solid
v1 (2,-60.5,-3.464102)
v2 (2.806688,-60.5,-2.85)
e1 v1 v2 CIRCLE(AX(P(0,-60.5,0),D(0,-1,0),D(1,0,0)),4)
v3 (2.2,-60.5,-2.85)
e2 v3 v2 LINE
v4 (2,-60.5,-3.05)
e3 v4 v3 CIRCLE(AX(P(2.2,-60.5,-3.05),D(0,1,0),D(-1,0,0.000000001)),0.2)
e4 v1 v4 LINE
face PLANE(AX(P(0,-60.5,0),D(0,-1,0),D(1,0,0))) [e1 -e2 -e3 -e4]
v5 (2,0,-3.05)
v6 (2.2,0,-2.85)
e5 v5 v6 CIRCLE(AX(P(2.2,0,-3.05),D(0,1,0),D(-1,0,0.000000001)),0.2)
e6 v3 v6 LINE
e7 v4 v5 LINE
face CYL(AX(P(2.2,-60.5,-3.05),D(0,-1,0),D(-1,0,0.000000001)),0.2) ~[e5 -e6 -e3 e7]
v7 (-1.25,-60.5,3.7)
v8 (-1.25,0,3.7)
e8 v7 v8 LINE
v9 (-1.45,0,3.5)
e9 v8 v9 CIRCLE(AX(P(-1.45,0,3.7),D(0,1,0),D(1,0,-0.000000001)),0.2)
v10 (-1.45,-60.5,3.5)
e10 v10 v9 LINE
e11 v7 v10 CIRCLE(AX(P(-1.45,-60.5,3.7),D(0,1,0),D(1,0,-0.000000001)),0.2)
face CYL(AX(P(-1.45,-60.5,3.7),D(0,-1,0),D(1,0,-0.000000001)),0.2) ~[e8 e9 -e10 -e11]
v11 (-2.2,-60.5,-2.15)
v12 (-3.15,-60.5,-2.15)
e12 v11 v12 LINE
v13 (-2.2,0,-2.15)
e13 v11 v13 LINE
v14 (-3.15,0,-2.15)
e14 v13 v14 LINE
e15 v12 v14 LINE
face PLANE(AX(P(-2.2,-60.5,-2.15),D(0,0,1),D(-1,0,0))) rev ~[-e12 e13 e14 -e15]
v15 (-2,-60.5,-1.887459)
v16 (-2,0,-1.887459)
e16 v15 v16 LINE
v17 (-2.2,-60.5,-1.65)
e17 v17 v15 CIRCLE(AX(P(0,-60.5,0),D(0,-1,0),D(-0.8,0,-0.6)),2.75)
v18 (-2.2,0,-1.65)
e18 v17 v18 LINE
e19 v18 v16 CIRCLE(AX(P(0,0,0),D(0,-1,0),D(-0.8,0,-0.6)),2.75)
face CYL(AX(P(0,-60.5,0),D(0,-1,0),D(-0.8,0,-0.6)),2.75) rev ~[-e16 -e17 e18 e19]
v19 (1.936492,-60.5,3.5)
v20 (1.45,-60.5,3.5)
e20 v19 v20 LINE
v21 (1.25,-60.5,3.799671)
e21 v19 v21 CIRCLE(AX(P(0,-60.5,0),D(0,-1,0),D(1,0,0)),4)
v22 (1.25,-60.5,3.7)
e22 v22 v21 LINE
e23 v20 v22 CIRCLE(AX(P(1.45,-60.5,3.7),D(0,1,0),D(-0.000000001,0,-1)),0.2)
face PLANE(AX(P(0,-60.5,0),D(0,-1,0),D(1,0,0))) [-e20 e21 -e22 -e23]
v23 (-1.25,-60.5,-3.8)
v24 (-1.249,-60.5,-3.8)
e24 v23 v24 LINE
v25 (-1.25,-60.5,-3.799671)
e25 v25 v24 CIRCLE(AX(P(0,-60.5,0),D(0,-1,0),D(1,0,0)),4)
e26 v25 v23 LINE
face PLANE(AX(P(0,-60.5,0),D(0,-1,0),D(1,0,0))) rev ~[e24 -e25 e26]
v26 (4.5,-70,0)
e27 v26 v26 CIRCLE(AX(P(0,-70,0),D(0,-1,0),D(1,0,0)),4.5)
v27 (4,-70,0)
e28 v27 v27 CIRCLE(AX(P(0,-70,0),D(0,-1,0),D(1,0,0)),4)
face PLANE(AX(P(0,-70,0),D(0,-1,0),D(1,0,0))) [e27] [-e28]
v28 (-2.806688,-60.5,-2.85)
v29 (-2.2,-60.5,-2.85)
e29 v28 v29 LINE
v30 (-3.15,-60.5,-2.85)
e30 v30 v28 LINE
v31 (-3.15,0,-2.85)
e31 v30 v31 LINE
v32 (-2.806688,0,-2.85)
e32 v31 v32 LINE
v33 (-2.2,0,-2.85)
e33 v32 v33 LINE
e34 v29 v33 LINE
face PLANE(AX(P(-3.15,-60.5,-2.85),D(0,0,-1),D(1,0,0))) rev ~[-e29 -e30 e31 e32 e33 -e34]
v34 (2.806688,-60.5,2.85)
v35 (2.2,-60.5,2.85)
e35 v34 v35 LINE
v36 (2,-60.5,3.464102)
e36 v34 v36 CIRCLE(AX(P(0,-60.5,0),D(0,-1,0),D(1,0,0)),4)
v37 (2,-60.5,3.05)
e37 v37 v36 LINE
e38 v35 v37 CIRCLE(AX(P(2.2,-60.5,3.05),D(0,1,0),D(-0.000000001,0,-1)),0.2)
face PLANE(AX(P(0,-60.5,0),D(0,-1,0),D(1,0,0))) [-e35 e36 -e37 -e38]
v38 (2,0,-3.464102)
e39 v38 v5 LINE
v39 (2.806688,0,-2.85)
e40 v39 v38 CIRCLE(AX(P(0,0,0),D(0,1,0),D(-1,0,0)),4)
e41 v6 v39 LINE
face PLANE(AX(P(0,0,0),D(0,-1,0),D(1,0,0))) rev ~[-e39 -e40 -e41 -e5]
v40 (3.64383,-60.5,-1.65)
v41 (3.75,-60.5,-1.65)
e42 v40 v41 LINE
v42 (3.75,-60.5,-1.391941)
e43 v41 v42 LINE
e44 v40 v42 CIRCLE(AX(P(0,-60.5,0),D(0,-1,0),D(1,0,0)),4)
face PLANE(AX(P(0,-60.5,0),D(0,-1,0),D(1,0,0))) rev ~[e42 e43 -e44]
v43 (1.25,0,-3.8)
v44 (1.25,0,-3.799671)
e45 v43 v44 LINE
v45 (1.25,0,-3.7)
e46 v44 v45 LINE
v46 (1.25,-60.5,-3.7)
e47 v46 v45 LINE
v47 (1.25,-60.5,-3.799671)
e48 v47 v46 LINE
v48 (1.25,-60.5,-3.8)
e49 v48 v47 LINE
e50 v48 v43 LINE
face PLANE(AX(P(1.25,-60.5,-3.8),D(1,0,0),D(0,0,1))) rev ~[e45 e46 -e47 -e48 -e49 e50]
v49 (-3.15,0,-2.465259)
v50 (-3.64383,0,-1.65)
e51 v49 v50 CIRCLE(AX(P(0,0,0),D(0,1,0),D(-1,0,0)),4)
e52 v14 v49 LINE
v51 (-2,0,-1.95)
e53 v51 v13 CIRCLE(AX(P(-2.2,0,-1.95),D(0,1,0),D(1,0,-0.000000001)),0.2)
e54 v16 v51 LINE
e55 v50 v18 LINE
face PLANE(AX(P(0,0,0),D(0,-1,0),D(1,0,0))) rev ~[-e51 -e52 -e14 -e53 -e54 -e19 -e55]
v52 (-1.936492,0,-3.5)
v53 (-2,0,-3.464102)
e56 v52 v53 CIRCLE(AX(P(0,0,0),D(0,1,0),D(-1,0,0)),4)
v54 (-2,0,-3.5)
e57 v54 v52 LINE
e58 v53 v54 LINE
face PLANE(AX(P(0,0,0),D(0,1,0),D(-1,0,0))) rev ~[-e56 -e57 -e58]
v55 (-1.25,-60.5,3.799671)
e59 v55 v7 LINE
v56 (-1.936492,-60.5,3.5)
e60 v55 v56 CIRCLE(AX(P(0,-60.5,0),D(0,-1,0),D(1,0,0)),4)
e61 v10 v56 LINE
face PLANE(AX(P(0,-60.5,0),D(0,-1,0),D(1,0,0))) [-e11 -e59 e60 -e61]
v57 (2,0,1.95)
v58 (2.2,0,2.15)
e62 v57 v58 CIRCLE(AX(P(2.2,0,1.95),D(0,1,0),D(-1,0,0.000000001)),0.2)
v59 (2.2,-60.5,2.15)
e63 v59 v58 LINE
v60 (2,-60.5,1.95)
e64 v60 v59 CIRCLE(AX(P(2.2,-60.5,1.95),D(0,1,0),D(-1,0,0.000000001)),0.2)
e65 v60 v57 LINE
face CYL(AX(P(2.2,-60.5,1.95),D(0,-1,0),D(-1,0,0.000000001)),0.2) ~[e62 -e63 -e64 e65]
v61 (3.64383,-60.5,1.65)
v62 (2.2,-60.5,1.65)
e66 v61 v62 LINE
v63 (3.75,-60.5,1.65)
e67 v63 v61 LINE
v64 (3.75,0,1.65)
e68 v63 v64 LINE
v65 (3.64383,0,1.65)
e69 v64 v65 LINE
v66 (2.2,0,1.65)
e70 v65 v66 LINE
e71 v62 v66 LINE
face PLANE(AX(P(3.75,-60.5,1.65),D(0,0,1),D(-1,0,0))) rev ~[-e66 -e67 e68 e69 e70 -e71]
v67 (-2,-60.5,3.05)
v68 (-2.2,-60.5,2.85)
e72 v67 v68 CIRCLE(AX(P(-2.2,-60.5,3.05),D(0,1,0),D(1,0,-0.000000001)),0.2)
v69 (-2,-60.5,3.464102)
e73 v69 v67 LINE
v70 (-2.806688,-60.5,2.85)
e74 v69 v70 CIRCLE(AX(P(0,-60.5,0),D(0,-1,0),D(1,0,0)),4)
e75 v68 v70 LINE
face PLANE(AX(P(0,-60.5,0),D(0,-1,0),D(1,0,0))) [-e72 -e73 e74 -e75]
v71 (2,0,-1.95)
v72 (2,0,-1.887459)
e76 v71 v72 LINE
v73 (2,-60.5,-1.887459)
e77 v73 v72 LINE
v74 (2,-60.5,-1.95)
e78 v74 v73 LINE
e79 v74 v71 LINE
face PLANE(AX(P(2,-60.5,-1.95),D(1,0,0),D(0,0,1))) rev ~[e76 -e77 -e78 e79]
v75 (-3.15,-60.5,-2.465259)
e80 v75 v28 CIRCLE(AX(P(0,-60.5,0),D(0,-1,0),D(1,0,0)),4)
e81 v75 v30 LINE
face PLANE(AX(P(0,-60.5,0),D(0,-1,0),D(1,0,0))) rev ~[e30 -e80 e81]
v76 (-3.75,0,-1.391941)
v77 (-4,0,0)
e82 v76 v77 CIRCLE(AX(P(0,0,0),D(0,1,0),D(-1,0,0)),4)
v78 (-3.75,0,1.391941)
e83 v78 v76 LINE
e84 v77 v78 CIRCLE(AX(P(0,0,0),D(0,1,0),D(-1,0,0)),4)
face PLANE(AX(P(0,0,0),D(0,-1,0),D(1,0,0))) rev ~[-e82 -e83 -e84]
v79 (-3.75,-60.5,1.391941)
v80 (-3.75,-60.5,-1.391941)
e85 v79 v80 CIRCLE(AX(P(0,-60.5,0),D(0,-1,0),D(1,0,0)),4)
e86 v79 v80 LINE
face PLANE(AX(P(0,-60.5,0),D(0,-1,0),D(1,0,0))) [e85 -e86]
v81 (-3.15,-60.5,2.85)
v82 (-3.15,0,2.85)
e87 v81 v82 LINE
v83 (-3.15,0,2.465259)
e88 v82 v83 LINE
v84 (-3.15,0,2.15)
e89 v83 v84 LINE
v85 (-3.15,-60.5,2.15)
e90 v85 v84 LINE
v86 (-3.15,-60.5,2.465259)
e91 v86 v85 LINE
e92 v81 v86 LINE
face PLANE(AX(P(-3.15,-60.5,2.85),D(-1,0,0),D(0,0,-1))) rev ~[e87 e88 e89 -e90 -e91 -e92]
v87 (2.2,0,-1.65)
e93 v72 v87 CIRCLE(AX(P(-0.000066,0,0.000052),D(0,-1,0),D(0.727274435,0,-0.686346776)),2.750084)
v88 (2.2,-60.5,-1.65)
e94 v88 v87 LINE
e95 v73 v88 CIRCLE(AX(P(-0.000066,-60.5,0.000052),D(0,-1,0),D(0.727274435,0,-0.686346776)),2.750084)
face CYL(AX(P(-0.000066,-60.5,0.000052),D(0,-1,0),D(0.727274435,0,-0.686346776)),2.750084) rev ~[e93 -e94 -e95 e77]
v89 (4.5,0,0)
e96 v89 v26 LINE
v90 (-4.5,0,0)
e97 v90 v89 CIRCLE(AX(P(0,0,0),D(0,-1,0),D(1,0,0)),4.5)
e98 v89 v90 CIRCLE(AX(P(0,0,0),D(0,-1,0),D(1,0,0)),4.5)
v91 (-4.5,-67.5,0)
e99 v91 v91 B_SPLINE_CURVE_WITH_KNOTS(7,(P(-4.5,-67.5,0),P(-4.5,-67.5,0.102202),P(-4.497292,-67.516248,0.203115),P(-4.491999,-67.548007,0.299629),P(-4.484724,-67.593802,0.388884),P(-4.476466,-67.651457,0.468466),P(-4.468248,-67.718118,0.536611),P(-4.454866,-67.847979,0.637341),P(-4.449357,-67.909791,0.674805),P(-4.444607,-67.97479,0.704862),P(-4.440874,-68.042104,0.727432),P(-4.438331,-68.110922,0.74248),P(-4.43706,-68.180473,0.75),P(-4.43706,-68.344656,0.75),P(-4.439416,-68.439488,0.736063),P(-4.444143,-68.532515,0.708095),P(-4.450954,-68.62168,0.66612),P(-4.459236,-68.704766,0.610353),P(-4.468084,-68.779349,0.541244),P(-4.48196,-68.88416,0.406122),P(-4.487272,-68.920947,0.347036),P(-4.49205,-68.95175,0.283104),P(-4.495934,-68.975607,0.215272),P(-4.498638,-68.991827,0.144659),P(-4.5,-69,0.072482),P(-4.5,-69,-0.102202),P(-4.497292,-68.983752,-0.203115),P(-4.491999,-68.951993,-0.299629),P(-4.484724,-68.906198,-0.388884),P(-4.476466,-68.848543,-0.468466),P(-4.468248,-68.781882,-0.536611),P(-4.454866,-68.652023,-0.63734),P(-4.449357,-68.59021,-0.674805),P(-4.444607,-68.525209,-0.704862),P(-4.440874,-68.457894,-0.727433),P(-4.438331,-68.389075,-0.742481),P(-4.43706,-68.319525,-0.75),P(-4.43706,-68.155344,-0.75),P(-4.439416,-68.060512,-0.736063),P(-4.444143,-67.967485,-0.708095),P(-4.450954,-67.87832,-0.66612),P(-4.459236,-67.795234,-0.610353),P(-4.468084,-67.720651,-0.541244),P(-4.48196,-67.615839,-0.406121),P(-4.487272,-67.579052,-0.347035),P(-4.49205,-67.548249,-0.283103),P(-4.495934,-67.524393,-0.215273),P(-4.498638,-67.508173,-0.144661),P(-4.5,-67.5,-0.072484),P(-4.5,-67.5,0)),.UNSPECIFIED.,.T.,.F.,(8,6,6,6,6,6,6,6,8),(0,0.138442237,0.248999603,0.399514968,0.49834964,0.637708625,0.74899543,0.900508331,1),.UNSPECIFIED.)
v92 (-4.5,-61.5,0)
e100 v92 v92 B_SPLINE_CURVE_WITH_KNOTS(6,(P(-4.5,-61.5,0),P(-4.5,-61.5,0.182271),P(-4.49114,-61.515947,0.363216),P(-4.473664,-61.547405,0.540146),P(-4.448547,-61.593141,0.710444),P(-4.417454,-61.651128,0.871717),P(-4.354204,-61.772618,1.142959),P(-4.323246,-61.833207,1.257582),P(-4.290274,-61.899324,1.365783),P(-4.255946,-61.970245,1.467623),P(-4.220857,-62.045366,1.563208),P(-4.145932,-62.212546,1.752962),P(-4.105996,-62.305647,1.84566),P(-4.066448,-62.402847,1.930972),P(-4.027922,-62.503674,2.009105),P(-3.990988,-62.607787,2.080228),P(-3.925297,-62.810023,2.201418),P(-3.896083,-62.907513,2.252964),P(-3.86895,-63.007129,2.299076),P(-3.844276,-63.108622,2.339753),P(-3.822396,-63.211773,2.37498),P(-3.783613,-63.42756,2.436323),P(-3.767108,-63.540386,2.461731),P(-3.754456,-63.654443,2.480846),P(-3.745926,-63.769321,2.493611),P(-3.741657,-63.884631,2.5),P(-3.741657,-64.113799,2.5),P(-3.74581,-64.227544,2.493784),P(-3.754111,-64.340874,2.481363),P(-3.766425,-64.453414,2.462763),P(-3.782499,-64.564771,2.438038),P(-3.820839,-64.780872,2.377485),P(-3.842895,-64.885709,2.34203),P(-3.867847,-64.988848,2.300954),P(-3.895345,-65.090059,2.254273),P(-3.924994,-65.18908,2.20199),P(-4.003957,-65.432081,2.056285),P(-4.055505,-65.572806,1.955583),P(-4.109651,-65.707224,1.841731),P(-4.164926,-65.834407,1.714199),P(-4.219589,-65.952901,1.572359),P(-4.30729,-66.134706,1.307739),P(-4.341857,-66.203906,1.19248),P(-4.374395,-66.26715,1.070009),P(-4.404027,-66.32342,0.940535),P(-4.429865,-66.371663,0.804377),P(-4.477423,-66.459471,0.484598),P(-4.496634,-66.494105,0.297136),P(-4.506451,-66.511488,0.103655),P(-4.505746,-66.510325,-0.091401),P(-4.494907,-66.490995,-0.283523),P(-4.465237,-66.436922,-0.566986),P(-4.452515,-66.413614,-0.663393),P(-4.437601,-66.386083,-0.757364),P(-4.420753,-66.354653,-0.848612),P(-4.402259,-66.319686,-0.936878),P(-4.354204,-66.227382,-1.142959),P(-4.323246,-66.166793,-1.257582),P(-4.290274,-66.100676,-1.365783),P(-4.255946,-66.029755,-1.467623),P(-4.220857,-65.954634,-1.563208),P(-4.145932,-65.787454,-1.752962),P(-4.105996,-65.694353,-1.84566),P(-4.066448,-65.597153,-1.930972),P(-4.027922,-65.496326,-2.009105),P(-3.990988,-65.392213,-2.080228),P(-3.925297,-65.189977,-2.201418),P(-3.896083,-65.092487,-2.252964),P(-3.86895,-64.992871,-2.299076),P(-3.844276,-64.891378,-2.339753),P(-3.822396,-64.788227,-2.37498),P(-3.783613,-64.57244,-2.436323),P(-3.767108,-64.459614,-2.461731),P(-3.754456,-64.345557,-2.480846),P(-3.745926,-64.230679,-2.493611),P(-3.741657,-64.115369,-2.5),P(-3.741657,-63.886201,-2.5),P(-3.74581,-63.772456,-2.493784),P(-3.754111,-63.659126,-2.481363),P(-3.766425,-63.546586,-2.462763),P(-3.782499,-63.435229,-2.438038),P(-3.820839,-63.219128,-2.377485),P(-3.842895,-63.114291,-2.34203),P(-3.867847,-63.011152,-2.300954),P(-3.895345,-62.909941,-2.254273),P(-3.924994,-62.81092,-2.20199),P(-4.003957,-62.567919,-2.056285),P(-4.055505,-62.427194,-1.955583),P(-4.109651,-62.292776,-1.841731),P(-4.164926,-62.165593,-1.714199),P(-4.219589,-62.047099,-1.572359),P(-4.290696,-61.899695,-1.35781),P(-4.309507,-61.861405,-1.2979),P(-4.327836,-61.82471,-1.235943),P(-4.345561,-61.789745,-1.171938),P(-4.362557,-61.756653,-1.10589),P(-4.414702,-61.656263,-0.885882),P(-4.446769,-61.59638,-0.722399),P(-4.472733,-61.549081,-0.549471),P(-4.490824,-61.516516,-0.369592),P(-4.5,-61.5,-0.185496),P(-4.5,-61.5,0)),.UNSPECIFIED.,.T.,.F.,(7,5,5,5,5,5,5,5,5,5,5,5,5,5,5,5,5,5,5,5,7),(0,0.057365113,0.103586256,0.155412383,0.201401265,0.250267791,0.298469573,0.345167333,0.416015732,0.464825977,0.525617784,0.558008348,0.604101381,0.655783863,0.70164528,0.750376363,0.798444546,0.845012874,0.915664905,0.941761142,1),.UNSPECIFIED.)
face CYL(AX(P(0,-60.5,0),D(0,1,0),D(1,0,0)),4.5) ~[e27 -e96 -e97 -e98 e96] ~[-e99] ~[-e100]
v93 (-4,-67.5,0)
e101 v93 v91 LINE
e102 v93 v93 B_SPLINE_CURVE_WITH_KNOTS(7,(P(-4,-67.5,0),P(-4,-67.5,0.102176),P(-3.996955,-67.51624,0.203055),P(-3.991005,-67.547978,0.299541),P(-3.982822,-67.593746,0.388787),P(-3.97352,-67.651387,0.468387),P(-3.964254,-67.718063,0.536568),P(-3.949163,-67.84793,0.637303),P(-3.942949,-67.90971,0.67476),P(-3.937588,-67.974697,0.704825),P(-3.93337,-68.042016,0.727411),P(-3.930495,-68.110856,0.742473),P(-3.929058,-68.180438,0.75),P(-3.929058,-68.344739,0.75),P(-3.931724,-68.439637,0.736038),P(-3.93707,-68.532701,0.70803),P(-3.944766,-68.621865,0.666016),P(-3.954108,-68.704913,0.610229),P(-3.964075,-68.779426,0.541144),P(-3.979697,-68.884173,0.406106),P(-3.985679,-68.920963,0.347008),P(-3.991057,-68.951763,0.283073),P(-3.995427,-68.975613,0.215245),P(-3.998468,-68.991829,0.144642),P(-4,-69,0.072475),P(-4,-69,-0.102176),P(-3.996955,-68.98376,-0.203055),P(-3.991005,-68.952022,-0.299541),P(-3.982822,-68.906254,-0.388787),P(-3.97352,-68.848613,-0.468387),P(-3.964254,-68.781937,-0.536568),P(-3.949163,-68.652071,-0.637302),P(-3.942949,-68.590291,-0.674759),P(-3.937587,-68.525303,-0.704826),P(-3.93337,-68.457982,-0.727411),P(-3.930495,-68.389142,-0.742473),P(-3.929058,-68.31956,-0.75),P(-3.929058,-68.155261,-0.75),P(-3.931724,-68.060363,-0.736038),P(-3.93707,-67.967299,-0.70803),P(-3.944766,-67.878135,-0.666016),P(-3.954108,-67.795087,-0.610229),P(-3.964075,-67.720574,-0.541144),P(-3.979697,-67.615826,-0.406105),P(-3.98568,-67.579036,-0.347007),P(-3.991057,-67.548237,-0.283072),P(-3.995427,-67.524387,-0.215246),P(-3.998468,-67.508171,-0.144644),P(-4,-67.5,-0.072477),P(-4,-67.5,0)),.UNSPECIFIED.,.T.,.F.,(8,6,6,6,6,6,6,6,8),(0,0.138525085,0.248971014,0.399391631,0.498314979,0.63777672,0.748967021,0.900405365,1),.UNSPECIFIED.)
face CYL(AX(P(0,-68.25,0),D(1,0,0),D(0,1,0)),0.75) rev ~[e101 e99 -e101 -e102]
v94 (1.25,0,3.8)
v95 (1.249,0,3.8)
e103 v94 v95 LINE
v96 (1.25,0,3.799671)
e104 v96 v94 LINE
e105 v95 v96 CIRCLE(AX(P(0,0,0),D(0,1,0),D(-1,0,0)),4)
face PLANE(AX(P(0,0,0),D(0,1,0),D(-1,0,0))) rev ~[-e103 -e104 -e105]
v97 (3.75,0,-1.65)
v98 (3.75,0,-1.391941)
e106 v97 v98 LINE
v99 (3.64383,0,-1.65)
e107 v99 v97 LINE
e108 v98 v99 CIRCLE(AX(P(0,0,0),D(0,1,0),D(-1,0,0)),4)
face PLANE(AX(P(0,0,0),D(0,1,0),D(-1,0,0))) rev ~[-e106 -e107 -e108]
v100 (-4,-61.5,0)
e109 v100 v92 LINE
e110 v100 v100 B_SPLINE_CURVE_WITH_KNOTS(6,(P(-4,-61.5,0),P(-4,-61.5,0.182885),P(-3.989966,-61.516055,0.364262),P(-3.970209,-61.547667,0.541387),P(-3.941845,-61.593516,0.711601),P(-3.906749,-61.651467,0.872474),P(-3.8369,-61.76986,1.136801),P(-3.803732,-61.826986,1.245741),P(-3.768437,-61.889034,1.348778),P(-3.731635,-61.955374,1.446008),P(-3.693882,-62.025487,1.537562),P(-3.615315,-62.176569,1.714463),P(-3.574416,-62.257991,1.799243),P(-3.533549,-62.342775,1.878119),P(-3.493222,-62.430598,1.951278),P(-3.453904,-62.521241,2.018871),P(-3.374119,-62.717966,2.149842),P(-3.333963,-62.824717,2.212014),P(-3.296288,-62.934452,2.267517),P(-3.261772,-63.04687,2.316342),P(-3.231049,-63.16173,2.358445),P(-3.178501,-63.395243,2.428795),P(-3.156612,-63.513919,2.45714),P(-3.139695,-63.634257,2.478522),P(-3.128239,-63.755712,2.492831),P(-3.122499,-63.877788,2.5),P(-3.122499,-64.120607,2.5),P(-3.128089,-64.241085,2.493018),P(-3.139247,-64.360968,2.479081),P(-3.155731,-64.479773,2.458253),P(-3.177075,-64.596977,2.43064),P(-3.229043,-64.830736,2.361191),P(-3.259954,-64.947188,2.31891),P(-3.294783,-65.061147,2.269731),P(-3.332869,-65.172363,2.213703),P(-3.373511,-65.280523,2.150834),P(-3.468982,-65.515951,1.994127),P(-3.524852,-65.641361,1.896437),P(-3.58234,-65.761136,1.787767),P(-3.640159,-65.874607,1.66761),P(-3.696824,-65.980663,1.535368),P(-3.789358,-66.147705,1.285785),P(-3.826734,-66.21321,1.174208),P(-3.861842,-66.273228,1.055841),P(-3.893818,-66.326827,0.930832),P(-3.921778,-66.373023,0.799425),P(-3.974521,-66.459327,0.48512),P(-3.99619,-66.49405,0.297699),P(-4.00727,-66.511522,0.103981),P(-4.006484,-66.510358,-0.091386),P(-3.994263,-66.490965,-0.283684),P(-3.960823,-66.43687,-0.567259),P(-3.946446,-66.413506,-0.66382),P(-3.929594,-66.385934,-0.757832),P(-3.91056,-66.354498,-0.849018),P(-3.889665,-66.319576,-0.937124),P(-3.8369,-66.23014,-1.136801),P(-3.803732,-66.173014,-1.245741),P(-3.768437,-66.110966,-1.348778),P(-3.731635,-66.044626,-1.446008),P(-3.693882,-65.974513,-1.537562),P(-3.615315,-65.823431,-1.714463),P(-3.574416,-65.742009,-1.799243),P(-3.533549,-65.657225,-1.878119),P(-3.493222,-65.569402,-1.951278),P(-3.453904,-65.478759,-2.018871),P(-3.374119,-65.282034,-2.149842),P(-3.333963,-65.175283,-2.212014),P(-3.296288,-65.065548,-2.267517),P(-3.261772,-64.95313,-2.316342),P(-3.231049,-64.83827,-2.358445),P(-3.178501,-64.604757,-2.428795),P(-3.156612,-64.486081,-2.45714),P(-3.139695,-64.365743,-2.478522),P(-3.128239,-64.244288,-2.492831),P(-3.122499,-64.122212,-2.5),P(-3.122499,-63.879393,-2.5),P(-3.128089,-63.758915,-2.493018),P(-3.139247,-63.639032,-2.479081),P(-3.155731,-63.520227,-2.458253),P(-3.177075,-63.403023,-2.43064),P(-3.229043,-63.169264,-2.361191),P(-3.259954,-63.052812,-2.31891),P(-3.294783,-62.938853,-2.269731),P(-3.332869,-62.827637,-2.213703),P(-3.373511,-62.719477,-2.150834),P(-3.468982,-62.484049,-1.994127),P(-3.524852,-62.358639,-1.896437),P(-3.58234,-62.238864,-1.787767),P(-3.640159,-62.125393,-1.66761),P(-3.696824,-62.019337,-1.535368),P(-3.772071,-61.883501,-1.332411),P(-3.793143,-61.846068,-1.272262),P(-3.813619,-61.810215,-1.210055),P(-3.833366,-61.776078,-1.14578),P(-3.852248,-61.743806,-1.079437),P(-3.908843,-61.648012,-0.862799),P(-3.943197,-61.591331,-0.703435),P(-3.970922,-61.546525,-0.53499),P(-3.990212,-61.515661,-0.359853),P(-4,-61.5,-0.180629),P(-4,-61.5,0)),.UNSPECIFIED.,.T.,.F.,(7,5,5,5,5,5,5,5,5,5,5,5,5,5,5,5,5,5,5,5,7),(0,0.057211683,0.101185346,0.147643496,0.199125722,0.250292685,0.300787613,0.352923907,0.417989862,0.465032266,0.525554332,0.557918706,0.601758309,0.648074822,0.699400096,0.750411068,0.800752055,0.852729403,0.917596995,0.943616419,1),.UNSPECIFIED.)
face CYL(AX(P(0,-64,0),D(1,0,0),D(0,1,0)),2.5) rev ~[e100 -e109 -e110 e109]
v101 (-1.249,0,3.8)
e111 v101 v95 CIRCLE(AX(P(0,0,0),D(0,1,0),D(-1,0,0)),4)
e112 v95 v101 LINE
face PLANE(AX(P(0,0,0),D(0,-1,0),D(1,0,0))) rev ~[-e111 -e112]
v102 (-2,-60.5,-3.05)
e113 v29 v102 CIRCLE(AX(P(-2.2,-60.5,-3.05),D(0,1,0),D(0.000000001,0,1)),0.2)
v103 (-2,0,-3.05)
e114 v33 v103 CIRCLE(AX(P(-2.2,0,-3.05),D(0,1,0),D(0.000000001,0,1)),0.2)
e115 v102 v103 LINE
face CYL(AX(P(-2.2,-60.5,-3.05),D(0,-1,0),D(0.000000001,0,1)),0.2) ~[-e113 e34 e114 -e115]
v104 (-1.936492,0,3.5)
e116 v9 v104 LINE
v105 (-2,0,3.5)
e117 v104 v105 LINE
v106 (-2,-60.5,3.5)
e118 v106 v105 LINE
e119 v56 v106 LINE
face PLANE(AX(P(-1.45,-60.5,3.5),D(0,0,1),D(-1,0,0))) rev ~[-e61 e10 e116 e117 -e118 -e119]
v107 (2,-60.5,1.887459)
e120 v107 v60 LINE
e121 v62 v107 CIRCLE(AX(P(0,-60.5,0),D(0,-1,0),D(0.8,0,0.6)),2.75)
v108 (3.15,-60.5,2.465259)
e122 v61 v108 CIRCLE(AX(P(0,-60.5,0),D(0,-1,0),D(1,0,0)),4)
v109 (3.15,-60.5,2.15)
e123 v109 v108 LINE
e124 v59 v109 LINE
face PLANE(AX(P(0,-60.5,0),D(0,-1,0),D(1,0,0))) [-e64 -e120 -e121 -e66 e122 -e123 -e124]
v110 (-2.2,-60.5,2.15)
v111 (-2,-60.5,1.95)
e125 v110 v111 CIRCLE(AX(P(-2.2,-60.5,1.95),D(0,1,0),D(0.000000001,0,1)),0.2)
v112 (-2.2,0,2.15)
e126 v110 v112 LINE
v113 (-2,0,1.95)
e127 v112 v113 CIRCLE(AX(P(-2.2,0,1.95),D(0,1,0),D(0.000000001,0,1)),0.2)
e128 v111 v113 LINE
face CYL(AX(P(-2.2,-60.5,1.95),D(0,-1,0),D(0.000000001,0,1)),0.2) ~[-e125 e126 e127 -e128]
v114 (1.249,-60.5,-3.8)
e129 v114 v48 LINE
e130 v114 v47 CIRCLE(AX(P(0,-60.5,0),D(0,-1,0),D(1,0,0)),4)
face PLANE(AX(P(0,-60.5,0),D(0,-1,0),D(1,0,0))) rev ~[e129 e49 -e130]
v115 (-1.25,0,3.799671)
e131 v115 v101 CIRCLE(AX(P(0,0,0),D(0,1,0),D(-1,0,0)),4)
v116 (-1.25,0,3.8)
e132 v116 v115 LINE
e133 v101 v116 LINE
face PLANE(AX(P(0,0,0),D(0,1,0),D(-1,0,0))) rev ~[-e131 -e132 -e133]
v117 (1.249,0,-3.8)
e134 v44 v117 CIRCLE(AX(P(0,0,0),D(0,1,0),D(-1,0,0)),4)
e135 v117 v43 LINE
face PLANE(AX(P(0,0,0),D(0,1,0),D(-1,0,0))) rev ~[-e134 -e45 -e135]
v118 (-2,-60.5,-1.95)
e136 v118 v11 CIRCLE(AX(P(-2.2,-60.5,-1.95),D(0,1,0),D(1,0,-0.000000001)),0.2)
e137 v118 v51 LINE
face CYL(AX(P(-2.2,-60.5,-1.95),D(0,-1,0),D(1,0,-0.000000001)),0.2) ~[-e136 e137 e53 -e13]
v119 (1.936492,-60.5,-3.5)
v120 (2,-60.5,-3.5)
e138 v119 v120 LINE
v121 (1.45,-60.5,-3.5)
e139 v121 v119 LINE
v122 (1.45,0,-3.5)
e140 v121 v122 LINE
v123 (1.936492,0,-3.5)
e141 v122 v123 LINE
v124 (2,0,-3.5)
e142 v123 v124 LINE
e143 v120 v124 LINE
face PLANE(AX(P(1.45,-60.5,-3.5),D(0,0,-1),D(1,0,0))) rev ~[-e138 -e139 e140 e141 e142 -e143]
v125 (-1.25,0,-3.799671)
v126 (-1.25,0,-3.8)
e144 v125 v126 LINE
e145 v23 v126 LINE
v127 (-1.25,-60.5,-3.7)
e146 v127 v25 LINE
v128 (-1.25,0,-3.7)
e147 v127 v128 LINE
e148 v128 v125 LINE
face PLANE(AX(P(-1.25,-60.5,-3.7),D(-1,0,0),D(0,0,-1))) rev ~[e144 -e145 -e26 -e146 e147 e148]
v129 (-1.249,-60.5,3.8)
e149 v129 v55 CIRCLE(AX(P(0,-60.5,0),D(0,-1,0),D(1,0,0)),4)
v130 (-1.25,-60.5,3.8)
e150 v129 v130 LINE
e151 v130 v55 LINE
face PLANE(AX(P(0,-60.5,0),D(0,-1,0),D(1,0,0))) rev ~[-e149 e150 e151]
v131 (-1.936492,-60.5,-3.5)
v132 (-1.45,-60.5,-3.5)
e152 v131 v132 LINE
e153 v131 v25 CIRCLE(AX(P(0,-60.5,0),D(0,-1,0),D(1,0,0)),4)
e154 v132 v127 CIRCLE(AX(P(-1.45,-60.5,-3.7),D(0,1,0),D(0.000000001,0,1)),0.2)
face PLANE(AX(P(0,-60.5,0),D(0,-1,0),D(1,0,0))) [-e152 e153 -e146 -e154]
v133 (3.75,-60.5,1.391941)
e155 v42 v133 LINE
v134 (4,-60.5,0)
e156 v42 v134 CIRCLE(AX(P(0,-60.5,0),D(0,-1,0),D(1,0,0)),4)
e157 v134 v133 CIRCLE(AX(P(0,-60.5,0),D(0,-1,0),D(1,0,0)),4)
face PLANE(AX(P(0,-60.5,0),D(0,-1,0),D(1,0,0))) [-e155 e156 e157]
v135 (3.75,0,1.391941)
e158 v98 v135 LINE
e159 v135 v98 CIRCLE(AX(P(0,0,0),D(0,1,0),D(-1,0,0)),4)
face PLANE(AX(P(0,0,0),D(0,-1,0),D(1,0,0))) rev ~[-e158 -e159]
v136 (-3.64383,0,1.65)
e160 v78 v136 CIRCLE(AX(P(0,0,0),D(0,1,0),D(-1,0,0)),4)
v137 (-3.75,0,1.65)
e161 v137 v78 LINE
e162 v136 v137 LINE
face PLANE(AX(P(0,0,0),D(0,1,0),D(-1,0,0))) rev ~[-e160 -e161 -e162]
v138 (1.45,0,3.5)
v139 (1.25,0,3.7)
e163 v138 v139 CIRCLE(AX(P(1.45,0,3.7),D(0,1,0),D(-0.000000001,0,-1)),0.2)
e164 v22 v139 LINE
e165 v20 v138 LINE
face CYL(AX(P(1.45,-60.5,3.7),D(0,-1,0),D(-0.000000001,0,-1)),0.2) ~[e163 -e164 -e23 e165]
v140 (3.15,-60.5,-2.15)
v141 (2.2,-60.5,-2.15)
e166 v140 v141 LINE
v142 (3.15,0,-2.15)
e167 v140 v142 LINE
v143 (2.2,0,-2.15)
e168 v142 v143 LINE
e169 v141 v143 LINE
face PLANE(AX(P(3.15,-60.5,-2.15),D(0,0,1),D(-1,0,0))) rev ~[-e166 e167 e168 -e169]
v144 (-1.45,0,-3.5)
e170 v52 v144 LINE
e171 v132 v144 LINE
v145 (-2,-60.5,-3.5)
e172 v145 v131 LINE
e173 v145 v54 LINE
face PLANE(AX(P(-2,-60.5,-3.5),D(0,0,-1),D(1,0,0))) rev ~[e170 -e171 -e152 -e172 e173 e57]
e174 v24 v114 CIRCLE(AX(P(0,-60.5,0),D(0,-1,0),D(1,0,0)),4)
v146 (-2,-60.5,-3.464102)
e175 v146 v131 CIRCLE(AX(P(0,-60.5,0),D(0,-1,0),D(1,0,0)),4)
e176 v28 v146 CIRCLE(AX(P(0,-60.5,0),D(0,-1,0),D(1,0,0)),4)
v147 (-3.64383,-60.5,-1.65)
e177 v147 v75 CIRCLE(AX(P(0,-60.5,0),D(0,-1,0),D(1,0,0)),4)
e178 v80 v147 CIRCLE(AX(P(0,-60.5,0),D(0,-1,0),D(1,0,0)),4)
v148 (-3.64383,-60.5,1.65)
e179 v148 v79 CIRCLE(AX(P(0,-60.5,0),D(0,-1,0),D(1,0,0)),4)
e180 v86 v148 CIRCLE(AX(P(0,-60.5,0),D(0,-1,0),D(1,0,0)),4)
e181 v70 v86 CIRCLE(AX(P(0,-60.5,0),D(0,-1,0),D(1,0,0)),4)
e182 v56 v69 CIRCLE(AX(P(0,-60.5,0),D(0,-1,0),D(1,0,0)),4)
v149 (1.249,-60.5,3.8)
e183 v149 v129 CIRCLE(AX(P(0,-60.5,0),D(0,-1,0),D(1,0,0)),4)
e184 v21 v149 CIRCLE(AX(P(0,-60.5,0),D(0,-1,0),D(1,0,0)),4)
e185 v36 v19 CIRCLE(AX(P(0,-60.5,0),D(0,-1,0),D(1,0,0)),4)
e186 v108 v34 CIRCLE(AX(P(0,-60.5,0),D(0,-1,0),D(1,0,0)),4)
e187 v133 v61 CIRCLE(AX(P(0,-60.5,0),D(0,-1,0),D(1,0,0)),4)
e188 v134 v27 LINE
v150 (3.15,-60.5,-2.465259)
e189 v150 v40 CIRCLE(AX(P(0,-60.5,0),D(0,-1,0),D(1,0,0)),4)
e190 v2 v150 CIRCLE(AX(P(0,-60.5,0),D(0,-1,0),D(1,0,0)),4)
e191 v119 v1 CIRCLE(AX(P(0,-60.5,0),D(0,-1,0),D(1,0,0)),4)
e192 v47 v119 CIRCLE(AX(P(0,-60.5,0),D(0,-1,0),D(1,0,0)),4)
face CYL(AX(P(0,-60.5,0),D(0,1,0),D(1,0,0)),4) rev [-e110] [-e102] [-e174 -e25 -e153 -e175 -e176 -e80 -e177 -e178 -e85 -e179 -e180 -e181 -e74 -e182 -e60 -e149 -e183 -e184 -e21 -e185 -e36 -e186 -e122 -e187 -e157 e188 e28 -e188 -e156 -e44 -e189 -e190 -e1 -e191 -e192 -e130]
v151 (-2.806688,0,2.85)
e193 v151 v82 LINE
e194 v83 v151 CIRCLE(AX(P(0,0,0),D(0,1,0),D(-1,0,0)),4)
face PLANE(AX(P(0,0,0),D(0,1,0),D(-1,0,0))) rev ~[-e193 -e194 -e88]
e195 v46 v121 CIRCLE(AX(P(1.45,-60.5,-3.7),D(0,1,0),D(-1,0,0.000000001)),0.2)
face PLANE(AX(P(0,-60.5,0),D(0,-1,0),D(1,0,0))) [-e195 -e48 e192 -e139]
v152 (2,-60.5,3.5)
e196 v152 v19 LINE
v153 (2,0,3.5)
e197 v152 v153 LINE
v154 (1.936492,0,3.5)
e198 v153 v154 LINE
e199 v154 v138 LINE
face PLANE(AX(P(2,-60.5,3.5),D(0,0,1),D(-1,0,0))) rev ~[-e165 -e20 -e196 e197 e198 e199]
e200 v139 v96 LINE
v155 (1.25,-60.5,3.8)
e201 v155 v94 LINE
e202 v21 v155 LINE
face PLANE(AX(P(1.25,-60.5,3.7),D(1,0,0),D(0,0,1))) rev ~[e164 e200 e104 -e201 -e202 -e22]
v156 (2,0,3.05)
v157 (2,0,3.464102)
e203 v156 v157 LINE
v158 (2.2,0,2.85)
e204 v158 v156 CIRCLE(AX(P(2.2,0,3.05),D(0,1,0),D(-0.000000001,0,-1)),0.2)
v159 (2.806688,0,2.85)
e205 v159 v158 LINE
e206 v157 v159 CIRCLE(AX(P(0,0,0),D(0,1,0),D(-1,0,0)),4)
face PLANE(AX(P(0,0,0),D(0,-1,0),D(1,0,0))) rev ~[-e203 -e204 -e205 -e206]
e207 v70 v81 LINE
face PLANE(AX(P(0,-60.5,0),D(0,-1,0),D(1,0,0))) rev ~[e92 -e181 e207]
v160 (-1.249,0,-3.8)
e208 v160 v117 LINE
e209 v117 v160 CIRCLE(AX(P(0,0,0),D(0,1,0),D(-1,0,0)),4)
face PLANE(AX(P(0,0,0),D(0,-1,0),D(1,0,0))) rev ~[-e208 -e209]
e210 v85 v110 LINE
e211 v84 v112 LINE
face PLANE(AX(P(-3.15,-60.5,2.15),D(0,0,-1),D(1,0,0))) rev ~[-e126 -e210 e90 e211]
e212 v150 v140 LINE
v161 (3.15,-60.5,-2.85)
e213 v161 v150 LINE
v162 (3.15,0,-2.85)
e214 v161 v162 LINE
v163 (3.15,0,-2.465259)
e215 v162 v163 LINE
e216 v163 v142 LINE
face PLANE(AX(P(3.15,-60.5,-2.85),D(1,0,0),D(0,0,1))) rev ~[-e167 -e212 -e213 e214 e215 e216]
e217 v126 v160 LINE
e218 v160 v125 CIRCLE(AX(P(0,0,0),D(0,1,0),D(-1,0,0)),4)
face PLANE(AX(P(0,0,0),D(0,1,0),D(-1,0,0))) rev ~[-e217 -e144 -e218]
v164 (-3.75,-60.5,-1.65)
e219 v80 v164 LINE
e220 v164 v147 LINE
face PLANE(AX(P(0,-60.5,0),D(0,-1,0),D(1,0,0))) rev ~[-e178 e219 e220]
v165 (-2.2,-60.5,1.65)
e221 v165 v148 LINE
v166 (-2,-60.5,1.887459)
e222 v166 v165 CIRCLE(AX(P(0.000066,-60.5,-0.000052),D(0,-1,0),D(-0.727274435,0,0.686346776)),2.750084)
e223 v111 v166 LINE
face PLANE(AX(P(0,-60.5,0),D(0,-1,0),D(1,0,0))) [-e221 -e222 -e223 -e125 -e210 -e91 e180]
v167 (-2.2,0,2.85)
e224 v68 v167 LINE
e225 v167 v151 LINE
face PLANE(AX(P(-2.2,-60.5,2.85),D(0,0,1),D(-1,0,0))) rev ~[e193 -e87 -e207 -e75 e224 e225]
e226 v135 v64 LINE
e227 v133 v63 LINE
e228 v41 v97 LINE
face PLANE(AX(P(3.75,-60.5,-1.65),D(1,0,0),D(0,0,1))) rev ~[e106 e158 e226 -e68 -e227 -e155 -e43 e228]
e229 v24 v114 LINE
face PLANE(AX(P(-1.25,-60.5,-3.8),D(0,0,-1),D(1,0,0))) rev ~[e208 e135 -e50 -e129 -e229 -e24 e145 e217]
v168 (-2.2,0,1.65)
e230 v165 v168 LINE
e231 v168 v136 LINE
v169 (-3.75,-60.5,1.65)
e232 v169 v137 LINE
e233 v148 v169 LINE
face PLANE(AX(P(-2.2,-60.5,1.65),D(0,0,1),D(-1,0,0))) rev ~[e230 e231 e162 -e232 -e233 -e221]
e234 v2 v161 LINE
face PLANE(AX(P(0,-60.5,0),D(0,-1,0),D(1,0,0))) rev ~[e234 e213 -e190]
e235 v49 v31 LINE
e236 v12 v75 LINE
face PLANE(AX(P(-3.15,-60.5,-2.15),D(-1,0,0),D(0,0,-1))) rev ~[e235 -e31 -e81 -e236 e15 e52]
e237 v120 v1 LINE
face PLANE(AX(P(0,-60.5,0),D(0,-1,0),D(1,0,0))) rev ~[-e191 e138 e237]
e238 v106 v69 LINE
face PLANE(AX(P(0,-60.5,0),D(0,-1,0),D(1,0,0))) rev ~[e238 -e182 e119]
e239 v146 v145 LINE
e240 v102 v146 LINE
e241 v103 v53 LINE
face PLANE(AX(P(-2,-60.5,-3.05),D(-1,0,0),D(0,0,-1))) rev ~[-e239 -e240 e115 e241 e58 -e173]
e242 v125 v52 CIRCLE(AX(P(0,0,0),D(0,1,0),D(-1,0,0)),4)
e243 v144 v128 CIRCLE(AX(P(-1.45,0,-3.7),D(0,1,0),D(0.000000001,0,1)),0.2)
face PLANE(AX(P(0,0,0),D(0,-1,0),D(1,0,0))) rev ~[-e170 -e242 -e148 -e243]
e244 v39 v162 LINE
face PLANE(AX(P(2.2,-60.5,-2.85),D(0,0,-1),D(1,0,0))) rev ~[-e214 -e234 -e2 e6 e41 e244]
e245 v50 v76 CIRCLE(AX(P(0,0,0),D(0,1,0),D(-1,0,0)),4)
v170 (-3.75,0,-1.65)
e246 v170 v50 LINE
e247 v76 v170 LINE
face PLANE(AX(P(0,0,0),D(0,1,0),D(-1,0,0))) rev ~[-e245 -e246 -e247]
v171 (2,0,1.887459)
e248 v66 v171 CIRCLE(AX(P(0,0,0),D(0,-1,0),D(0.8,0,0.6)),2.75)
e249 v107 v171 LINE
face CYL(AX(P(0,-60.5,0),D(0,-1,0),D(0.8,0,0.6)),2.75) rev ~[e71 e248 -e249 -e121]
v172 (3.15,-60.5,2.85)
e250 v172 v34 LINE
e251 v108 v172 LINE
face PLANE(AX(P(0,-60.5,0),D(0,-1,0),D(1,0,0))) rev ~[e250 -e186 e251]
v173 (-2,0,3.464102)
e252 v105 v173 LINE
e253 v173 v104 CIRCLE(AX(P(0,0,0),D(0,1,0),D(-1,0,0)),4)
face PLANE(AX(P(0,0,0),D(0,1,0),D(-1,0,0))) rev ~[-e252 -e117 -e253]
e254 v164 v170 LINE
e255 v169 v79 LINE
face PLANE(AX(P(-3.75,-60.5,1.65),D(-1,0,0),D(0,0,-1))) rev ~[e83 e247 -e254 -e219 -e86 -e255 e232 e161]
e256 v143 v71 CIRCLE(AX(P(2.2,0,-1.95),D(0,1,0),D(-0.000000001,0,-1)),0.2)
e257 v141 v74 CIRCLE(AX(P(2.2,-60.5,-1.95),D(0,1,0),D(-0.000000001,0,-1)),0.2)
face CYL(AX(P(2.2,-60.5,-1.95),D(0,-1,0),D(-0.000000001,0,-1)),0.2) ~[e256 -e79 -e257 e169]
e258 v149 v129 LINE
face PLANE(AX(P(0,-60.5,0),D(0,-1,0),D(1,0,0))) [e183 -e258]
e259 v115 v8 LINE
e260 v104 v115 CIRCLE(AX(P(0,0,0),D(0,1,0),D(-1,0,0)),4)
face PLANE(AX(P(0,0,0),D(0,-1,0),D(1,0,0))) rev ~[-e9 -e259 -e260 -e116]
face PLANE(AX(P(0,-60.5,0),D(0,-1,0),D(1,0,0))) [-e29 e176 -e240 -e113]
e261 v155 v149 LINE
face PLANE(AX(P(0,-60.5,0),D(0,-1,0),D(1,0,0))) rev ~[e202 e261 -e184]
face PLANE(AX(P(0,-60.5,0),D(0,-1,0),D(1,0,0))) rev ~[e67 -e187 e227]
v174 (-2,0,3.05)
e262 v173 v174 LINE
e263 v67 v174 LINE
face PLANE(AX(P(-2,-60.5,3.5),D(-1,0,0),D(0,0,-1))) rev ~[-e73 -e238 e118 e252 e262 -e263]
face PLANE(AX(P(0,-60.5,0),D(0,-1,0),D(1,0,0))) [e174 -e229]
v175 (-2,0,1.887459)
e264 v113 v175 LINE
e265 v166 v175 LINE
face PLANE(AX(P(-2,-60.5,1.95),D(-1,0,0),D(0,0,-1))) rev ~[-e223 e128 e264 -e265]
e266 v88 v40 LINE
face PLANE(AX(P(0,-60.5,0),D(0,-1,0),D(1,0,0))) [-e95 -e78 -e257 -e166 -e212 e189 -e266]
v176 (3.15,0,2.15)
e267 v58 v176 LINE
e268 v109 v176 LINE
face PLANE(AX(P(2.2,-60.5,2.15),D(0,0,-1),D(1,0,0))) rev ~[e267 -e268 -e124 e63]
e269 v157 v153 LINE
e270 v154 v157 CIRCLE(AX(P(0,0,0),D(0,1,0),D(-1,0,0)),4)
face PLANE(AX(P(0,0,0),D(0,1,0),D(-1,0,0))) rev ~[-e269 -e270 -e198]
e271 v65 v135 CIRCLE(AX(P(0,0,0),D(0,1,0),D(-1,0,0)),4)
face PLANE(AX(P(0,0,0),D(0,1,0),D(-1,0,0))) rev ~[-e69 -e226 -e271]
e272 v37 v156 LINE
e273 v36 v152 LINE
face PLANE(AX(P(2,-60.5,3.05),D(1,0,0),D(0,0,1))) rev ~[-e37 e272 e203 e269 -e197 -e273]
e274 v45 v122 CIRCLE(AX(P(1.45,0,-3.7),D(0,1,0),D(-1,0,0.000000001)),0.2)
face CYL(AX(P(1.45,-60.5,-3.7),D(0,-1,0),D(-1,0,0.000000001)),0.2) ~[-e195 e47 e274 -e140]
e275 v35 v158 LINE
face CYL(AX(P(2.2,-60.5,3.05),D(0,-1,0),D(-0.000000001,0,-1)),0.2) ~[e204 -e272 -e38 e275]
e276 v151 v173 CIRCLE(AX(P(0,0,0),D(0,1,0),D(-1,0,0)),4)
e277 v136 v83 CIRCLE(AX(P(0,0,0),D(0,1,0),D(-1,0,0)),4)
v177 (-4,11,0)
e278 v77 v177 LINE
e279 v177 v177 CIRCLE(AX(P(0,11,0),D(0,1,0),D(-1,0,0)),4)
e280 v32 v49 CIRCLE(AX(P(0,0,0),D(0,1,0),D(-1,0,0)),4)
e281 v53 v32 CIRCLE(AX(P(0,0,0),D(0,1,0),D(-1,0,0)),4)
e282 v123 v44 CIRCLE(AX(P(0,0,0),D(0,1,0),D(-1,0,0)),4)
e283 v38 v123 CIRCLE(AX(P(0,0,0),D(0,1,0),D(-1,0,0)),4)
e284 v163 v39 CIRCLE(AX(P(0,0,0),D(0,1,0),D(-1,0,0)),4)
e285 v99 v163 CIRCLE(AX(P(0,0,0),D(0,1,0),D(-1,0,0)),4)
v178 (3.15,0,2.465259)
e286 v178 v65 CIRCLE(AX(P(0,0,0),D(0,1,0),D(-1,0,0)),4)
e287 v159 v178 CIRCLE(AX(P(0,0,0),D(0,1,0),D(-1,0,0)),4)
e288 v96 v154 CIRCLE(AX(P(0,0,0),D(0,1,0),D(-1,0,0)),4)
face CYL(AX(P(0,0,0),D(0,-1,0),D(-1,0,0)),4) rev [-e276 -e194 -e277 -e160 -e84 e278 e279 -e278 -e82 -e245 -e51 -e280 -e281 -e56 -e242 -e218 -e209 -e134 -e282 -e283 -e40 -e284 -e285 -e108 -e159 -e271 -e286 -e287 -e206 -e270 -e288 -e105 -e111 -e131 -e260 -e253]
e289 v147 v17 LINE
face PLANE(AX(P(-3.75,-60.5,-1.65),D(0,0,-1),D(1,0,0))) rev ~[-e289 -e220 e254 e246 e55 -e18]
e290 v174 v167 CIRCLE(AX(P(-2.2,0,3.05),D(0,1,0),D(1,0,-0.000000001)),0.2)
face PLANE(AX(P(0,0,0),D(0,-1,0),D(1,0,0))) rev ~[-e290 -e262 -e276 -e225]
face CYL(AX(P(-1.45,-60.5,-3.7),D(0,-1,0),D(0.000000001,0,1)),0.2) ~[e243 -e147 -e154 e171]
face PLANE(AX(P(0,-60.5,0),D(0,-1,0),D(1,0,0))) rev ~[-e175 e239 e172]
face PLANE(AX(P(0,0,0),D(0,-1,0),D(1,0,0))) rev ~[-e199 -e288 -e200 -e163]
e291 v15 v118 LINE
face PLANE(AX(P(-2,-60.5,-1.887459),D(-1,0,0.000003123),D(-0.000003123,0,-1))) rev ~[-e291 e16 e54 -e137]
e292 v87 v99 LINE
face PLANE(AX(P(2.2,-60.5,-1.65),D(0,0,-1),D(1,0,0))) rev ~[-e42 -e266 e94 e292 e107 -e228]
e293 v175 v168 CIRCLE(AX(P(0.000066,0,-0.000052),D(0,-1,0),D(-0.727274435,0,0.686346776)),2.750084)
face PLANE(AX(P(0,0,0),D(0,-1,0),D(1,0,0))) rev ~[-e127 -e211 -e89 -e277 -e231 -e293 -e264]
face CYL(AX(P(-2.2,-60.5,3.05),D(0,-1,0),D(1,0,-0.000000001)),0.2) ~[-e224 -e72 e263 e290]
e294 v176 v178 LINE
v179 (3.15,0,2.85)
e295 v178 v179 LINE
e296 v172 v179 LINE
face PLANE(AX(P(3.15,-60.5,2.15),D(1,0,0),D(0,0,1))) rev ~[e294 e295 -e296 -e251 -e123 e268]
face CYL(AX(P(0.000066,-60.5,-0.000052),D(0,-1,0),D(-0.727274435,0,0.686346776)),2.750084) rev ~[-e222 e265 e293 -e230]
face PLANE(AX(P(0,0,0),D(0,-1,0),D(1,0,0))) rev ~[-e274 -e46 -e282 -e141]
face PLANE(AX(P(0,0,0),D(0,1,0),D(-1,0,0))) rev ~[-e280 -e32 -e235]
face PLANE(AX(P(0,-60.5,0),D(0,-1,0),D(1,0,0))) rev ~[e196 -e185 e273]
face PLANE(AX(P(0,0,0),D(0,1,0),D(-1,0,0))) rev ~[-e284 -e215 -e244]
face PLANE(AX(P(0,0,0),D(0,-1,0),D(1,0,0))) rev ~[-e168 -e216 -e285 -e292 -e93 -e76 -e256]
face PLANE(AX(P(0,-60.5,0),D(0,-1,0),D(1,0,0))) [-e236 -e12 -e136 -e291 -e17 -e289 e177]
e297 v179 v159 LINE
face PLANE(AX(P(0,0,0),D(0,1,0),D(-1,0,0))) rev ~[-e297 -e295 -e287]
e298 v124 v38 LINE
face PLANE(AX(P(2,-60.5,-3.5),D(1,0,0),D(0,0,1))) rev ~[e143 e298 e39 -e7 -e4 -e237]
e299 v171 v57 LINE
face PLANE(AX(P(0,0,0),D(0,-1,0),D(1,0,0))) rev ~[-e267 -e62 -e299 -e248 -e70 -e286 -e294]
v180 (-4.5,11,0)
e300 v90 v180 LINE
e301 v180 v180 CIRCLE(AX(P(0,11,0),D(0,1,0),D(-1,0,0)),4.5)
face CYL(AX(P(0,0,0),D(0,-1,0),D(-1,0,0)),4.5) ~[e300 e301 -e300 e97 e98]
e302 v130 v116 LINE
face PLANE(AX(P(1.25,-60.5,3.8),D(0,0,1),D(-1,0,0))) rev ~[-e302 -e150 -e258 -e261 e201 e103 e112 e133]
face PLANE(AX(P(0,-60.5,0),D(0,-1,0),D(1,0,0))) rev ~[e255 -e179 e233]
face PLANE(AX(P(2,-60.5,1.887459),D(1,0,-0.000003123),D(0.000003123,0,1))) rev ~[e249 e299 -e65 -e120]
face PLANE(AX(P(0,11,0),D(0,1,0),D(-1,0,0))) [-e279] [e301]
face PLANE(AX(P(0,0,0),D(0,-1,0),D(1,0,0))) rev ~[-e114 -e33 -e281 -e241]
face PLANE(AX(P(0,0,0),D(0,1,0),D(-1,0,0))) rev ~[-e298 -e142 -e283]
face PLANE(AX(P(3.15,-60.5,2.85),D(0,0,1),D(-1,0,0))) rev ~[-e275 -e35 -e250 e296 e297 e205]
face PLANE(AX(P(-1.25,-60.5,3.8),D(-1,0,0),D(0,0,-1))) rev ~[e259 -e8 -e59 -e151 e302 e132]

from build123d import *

# Parameters (mm, degrees)
F3_R      = 4.5
F4_DEPTH  = 60.5
F8_DEPTH  = 60.5
F6_R      = 4.5
F6_R_2    = 4
F9_DEPTH  = 9.5
F7_R      = 4.5
F7_R_2    = 4
F10_DEPTH = 11
F11_R     = 2.5
F11_R_2   = 0.75
F12_DEPTH = 4.501


# Not quite as in the source:
# - ends of sketch curves that miss each other by under 0.0002 mm in the source are joined


with BuildPart() as f4:
    # F3 (on Front) → F4 (new body)
    with BuildSketch(Plane.XZ):
        Circle(F3_R)
    extrude(amount=F4_DEPTH)

    # F5 (on face) → F8 (cut, through all)
    with BuildSketch(Plane.XZ.offset(60.5)):
        with BuildLine():
            Line((-1.25, -3.8), (0, -3.8))
            Line((0, -3.8), (1.25, -3.8))
            Line((1.25, -3.8), (1.25, -3.7))
            ThreePointArc((1.25, -3.7), (1.3085786438, -3.5585786438), (1.45, -3.5))
            Line((1.45, -3.5), (2, -3.5))
            Line((2, -3.5), (2, -3.05))
            ThreePointArc((2, -3.05), (2.0585786438, -2.9085786438), (2.2, -2.85))
            Line((2.2, -2.85), (3.15, -2.85))
            Line((3.15, -2.85), (3.15, -2.15))
            Line((3.15, -2.15), (2.2, -2.15))
            ThreePointArc((2.2, -2.15), (2.0585786438, -2.0914213562), (2, -1.95))
            Line((2, -1.95), (2, -1.887459))
            ThreePointArc((2, -1.887459), (2.1033535752, -1.771554046), (2.2, -1.65))
            Line((2.2, -1.65), (3.75, -1.65))
            Line((3.75, -1.65), (3.75, 0))
            Line((3.75, 0), (3.75, 1.65))
            Line((3.75, 1.65), (2.2, 1.65))
            ThreePointArc((2.2, 1.65), (2.1033535752, 1.771554046), (1.9999998047, 1.8874588157))
            Line((1.9999998047, 1.8874588157), (2, 1.95))
            ThreePointArc((2, 1.95), (2.0585786438, 2.0914213562), (2.2, 2.15))
            Line((2.2, 2.15), (3.15, 2.15))
            Line((3.15, 2.15), (3.15, 2.85))
            Line((3.15, 2.85), (2.2, 2.85))
            ThreePointArc((2.2, 2.85), (2.0585786438, 2.9085786438), (2, 3.05))
            Line((2, 3.05), (2, 3.5))
            Line((2, 3.5), (1.45, 3.5))
            ThreePointArc((1.45, 3.5), (1.3085786438, 3.5585786438), (1.25, 3.7))
            Line((1.25, 3.7), (1.25, 3.8))
            Line((1.25, 3.8), (0, 3.8))
            Line((0, 3.8), (-1.25, 3.8))
            Line((-1.25, 3.8), (-1.25, 3.7))
            ThreePointArc((-1.25, 3.7), (-1.3085786438, 3.5585786438), (-1.45, 3.5))
            Line((-1.45, 3.5), (-2, 3.5))
            Line((-2, 3.5), (-2, 3.05))
            ThreePointArc((-2, 3.05), (-2.0585786438, 2.9085786438), (-2.2, 2.85))
            Line((-2.2, 2.85), (-3.15, 2.85))
            Line((-3.15, 2.85), (-3.15, 2.15))
            Line((-3.15, 2.15), (-2.2, 2.15))
            ThreePointArc((-2.2, 2.15), (-2.0585786438, 2.0914213562), (-2, 1.95))
            Line((-2, 1.95), (-2, 1.887459))
            ThreePointArc((-2, 1.887459), (-2.1033535752, 1.771554046), (-2.2, 1.65))
            Line((-2.2, 1.65), (-3.75, 1.65))
            Line((-3.75, 1.65), (-3.75, 0))
            Line((-3.75, 0), (-3.75, -1.65))
            Line((-3.75, -1.65), (-2.2, -1.65))
            ThreePointArc((-2.2, -1.65), (-2.1033535752, -1.771554046), (-1.9999998047, -1.8874588157))
            Line((-1.9999998047, -1.8874588157), (-2, -1.95))
            ThreePointArc((-2, -1.95), (-2.0585786438, -2.0914213562), (-2.2, -2.15))
            Line((-2.2, -2.15), (-3.15, -2.15))
            Line((-3.15, -2.15), (-3.15, -2.85))
            Line((-3.15, -2.85), (-2.2, -2.85))
            ThreePointArc((-2.2, -2.85), (-2.0585786438, -2.9085786438), (-2, -3.05))
            Line((-2, -3.05), (-2, -3.5))
            Line((-2, -3.5), (-1.45, -3.5))
            ThreePointArc((-1.45, -3.5), (-1.3085786438, -3.5585786438), (-1.25, -3.7))
            Line((-1.25, -3.7), (-1.25, -3.8))
        make_face()
    extrude(amount=-F8_DEPTH, mode=Mode.SUBTRACT)

    # F6 (on face) → F9 (join)
    with BuildSketch(Plane.XZ.offset(60.5)):
        Circle(F6_R)
        Circle(F6_R_2, mode=Mode.SUBTRACT)
    extrude(amount=F9_DEPTH)

    # F7 (on face) → F10 (join)
    with BuildSketch(Plane(origin=(0, 0, 0), x_dir=(-1, 0, 0), z_dir=(0, 1, 0))):
        Circle(F7_R)
        Circle(F7_R_2, mode=Mode.SUBTRACT)
    extrude(amount=F10_DEPTH)

    # F11 (on Right) → F12 (cut, through all)
    with BuildSketch(Plane.YZ):
        with Locations((-64, 0)):
            Circle(F11_R)
        with Locations((-68.25, 0)):
            Circle(F11_R_2)
    extrude(amount=-F12_DEPTH, mode=Mode.SUBTRACT)


solid = f4.part
